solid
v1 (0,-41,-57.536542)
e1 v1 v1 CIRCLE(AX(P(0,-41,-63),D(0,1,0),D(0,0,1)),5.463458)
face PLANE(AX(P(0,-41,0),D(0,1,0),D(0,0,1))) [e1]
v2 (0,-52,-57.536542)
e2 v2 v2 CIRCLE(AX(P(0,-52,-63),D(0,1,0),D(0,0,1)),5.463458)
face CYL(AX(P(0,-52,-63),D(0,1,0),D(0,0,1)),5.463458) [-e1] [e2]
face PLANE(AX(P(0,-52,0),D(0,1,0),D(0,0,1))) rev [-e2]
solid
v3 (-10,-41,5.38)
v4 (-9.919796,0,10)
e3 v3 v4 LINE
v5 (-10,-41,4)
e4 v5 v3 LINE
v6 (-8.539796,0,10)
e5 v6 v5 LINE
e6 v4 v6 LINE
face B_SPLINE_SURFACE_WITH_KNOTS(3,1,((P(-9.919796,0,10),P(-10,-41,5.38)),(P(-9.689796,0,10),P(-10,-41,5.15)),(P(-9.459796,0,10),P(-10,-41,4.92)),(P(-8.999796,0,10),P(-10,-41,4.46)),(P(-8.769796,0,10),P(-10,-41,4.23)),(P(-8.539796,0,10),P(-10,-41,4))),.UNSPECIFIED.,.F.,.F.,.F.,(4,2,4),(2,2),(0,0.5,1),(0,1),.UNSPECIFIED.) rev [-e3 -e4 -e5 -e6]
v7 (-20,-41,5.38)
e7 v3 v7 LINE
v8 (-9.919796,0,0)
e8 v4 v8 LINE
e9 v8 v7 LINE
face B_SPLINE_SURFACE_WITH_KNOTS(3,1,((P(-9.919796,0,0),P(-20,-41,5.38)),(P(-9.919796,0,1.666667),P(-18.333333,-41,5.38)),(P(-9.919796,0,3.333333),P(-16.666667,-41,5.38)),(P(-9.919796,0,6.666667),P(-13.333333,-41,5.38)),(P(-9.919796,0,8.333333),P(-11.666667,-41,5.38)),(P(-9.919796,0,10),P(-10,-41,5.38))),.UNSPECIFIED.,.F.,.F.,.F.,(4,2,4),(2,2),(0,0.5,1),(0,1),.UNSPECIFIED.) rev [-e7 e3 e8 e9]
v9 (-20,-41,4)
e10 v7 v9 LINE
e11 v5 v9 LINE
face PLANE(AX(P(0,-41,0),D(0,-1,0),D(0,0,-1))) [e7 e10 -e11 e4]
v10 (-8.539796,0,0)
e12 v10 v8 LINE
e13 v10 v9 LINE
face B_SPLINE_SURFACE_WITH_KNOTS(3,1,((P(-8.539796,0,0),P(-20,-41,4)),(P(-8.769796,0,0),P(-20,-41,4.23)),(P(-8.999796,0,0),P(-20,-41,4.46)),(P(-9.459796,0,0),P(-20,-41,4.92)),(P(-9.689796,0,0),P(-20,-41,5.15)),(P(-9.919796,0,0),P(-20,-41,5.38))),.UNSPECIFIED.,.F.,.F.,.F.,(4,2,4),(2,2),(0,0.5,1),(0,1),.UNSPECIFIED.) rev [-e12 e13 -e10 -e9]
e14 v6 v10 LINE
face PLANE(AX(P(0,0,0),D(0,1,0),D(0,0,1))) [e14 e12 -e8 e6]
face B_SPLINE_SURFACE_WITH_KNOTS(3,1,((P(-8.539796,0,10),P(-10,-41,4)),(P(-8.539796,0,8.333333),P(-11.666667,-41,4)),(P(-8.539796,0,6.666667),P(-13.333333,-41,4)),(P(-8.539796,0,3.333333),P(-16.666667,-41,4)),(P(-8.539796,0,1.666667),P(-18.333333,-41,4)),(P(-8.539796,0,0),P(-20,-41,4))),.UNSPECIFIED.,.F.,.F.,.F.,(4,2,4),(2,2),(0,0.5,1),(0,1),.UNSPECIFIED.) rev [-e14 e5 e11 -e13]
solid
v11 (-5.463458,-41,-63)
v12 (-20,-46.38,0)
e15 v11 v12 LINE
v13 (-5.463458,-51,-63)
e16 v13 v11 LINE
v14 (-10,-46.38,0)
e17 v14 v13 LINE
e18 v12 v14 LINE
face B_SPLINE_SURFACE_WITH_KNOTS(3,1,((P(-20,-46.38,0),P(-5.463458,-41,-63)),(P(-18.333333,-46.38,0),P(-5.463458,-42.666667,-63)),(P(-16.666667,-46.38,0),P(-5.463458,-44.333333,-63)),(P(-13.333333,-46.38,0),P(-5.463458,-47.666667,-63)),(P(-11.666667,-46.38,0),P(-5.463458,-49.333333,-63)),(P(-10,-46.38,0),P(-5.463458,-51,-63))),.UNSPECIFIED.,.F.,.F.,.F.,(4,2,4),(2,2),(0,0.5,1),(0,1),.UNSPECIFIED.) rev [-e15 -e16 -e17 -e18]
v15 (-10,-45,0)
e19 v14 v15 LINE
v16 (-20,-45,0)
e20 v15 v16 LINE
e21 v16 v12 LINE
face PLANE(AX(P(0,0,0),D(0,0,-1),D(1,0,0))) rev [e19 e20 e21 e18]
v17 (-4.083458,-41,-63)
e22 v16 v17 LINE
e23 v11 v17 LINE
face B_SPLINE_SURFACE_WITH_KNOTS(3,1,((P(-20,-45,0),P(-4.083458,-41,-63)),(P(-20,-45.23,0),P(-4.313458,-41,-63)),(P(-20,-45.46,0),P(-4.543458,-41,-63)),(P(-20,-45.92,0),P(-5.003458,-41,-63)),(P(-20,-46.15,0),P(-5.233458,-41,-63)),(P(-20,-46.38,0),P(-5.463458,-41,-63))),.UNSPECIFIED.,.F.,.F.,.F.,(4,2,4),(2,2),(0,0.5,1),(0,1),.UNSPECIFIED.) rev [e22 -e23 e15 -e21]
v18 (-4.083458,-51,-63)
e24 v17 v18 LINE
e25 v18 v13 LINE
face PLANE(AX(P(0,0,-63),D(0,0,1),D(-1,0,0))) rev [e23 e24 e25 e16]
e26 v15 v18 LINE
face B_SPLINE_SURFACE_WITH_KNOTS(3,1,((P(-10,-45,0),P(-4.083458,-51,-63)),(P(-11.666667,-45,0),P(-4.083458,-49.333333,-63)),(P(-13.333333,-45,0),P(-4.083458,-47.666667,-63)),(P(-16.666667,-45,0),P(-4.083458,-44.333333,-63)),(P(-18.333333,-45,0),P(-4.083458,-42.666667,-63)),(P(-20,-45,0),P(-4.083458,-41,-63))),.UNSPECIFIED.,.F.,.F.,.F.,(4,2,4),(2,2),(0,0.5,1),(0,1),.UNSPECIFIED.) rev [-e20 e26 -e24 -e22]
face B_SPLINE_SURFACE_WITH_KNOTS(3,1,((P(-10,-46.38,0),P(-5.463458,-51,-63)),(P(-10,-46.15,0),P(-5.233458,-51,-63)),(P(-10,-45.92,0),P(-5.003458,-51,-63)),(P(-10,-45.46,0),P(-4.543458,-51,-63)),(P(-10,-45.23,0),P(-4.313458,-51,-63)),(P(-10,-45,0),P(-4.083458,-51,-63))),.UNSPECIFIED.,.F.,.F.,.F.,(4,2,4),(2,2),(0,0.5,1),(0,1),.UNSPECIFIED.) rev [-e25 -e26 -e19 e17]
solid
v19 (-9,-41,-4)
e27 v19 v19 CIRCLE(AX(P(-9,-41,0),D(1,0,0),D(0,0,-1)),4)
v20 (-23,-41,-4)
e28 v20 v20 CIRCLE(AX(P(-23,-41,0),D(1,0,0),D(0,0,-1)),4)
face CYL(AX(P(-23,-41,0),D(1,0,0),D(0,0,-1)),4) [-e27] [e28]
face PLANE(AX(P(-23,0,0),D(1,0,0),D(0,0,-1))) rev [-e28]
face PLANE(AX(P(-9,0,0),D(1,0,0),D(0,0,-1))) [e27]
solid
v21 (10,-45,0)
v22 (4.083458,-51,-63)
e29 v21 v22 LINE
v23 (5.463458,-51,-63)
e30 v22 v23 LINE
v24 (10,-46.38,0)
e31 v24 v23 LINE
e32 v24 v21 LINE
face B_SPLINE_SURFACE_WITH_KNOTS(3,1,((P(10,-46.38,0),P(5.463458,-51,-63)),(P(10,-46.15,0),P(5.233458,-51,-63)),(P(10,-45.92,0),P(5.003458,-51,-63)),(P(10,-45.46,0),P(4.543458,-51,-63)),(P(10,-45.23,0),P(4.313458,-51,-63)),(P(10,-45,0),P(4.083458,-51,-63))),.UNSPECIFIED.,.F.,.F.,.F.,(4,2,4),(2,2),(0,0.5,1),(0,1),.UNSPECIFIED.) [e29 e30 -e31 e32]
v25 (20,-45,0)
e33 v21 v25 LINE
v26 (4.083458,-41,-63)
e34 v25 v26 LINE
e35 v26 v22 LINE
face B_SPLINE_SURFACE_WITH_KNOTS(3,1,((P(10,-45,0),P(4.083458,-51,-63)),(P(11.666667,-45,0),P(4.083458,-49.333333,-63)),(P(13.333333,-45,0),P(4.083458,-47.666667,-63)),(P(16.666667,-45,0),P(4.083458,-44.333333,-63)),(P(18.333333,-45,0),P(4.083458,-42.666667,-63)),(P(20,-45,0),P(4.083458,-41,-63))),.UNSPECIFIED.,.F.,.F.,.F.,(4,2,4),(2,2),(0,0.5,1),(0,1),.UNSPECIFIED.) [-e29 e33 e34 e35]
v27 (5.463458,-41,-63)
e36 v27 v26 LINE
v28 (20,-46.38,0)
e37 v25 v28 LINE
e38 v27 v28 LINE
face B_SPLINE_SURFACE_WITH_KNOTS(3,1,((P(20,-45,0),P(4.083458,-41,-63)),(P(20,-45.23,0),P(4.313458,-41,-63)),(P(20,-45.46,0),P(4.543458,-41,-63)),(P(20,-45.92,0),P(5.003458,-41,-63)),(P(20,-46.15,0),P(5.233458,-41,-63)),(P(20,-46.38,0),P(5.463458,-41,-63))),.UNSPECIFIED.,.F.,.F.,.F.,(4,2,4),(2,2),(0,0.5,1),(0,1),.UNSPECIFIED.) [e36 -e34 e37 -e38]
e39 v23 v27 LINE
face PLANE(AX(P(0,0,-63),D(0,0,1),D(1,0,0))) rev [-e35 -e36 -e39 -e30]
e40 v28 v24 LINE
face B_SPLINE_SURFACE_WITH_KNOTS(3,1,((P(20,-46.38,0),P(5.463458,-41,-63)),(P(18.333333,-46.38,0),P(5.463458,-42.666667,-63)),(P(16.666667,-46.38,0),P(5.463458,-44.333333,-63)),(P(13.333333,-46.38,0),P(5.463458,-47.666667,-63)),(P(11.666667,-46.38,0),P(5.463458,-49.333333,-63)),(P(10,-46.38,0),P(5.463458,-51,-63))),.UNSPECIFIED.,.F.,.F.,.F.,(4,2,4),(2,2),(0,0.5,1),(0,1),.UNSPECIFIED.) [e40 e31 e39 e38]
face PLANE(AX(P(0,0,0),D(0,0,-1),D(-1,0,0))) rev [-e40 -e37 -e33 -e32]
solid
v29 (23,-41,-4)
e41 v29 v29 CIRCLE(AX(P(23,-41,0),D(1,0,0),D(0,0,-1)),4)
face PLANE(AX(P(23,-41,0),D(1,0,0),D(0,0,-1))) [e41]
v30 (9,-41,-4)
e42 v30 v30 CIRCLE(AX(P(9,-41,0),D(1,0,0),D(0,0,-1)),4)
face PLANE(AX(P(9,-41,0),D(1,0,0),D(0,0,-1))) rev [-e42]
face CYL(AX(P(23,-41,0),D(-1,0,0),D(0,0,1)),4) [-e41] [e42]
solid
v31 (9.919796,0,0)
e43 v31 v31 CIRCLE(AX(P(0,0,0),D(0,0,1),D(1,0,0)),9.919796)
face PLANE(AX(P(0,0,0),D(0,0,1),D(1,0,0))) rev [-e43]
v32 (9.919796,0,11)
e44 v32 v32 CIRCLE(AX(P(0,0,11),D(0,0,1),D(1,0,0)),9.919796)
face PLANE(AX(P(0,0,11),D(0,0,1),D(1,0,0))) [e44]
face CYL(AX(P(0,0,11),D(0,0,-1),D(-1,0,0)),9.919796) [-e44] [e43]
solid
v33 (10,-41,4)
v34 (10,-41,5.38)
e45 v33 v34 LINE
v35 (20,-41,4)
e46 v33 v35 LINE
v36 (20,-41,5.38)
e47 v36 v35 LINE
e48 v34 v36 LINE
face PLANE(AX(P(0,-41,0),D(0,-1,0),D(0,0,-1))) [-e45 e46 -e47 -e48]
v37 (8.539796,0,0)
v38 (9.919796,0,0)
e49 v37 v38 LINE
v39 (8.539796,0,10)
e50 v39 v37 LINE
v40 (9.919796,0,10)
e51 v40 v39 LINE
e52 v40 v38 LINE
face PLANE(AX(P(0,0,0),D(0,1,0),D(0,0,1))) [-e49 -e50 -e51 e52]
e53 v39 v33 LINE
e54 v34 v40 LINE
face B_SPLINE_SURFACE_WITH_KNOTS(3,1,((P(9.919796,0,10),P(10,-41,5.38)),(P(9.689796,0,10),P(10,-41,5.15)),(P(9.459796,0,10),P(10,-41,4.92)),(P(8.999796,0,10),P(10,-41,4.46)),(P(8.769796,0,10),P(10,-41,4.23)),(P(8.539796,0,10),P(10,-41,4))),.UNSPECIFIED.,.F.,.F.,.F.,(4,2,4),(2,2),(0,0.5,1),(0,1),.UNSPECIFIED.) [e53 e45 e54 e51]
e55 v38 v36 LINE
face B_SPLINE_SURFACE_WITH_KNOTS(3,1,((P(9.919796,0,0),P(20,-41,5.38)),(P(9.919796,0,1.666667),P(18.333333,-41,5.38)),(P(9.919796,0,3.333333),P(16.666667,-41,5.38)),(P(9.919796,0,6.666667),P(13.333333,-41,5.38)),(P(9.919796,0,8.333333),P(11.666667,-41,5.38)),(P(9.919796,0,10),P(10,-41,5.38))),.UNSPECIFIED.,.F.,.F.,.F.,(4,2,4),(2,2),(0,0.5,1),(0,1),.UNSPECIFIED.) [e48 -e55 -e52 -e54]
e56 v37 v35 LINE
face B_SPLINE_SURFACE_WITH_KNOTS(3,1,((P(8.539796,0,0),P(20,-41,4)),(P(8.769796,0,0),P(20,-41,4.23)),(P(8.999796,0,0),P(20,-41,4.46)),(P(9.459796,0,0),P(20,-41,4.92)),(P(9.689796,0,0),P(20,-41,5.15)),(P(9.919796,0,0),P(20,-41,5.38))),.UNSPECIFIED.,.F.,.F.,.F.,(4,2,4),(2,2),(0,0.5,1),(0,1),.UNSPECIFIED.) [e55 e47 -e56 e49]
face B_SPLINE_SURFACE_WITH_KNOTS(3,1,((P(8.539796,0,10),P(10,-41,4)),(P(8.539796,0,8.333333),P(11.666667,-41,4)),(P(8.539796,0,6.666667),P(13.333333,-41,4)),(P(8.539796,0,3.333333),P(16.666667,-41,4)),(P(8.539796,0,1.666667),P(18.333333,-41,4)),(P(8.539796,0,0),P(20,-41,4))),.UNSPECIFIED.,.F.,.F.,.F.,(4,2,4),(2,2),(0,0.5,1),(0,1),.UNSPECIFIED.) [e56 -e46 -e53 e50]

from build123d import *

# Parameters (mm, degrees)
SKETCH_1_R      = 9.919796
EXTRUDE_1_DEPTH = 11
SKETCH_3_R      = 5.463458
EXTRUDE_2_DEPTH = 11
EXTRUDE_START   = 9
SKETCH_4_R      = 4
EXTRUDE_3_DEPTH = 14
EXTRUDE_START_2 = -9
SKETCH_4_3_R    = 4
EXTRUDE_4_DEPTH = 14


with BuildPart() as part:
    # Эскиз1 → Бобышка-Вытянуть1 (new body)
    with BuildSketch(Plane.XY):
        Circle(SKETCH_1_R)
    extrude(amount=EXTRUDE_1_DEPTH)


with BuildPart() as body_2:
    # Эскиз3 → Бобышка-Вытянуть2 (new body)
    with BuildSketch(Plane(origin=(0, -41, 0), x_dir=(1, 0, 0), z_dir=(0, 1, 0))):
        with Locations(Location((0, 63, 0), (0, 0, 270))):
            Circle(SKETCH_3_R)
    extrude(amount=-EXTRUDE_2_DEPTH)


with BuildPart() as body_3:
    # Эскиз4 → Бобышка-Вытянуть3 (new body)
    with BuildSketch(Plane(origin=(0, 0, 0), x_dir=(0, 0, -1), z_dir=(1, 0, 0)).offset(EXTRUDE_START)):
        with Locations((0, -41)):
            Circle(SKETCH_4_R)
    extrude(amount=EXTRUDE_3_DEPTH)


with BuildPart() as body_4:
    # Эскиз4<3> → Бобышка-Вытянуть4 (new body)
    with BuildSketch(Plane(origin=(0, 0, 0), x_dir=(0, 0, -1), z_dir=(1, 0, 0)).offset(EXTRUDE_START_2)):
        with Locations((0, -41)):
            Circle(SKETCH_4_3_R)
    extrude(amount=-EXTRUDE_4_DEPTH)


with BuildPart() as body_5:
    # По сечениям1: read off the stored shape, not the designer's step
    # По сечениям1: loft between two sections, ruled curve by curve
    loft_1_from = [
        Edge.make_bspline([(9.919796, 0, 10), (9.689796, 0, 10), (9.459796, 0, 10), (8.999796, 0, 10), (8.769796, 0, 10), (8.539796, 0, 10)], [0, 0, 0, 0, 0.5, 0.5, 1, 1, 1, 1], 3),
        Edge.make_bspline([(8.539796, 0, 10), (8.539796, 0, 8.333333333), (8.539796, 0, 6.666666667), (8.539796, 0, 3.333333333), (8.539796, 0, 1.666666667), (8.539796, 0, 0)], [0, 0, 0, 0, 0.5, 0.5, 1, 1, 1, 1], 3),
        Edge.make_bspline([(9.919796, 0, 0), (9.919796, 0, 1.666666667), (9.919796, 0, 3.333333333), (9.919796, 0, 6.666666667), (9.919796, 0, 8.333333333), (9.919796, 0, 10)], [0, 0, 0, 0, 0.5, 0.5, 1, 1, 1, 1], 3),
        Edge.make_bspline([(8.539796, 0, 0), (8.769796, 0, 0), (8.999796, 0, 0), (9.459796, 0, 0), (9.689796, 0, 0), (9.919796, 0, 0)], [0, 0, 0, 0, 0.5, 0.5, 1, 1, 1, 1], 3),
    ]
    loft_1_to = [
        Edge.make_bspline([(10, -41, 5.38), (10, -41, 5.15), (10, -41, 4.92), (10, -41, 4.46), (10, -41, 4.23), (10, -41, 4)], [0, 0, 0, 0, 0.5, 0.5, 1, 1, 1, 1], 3),
        Edge.make_bspline([(10, -41, 4), (11.666666667, -41, 4), (13.333333333, -41, 4), (16.666666667, -41, 4), (18.333333333, -41, 4), (20, -41, 4)], [0, 0, 0, 0, 0.5, 0.5, 1, 1, 1, 1], 3),
        Edge.make_bspline([(20, -41, 5.38), (18.333333333, -41, 5.38), (16.666666667, -41, 5.38), (13.333333333, -41, 5.38), (11.666666667, -41, 5.38), (10, -41, 5.38)], [0, 0, 0, 0, 0.5, 0.5, 1, 1, 1, 1], 3),
        Edge.make_bspline([(20, -41, 4), (20, -41, 4.23), (20, -41, 4.46), (20, -41, 4.92), (20, -41, 5.15), (20, -41, 5.38)], [0, 0, 0, 0, 0.5, 0.5, 1, 1, 1, 1], 3),
    ]
    loft_1 = Solid(Shell([*[Face.make_surface_from_curves(loft_1_from[k], loft_1_to[k]) for k in range(4)], Face(Wire(loft_1_from)), Face(Wire(loft_1_to))]))
    add(loft_1)


with BuildPart() as body_6:
    # По сечениям3: read off the stored shape, not the designer's step
    # По сечениям3: loft between two sections, ruled curve by curve
    loft_3_from = [
        Edge.make_bspline([(20, -46.38, 0), (18.333333333, -46.38, 0), (16.666666667, -46.38, 0), (13.333333333, -46.38, 0), (11.666666667, -46.38, 0), (10, -46.38, 0)], [0, 0, 0, 0, 0.5, 0.5, 1, 1, 1, 1], 3),
        Edge.make_bspline([(10, -46.38, 0), (10, -46.15, 0), (10, -45.92, 0), (10, -45.46, 0), (10, -45.23, 0), (10, -45, 0)], [0, 0, 0, 0, 0.5, 0.5, 1, 1, 1, 1], 3),
        Edge.make_bspline([(20, -45, 0), (20, -45.23, 0), (20, -45.46, 0), (20, -45.92, 0), (20, -46.15, 0), (20, -46.38, 0)], [0, 0, 0, 0, 0.5, 0.5, 1, 1, 1, 1], 3),
        Edge.make_bspline([(10, -45, 0), (11.666666667, -45, 0), (13.333333333, -45, 0), (16.666666667, -45, 0), (18.333333333, -45, 0), (20, -45, 0)], [0, 0, 0, 0, 0.5, 0.5, 1, 1, 1, 1], 3),
    ]
    loft_3_to = [
        Edge.make_bspline([(5.463458, -41, -63), (5.463458, -42.666666667, -63), (5.463458, -44.333333333, -63), (5.463458, -47.666666667, -63), (5.463458, -49.333333333, -63), (5.463458, -51, -63)], [0, 0, 0, 0, 0.5, 0.5, 1, 1, 1, 1], 3),
        Edge.make_bspline([(5.463458, -51, -63), (5.233458, -51, -63), (5.003458, -51, -63), (4.543458, -51, -63), (4.313458, -51, -63), (4.083458, -51, -63)], [0, 0, 0, 0, 0.5, 0.5, 1, 1, 1, 1], 3),
        Edge.make_bspline([(4.083458, -41, -63), (4.313458, -41, -63), (4.543458, -41, -63), (5.003458, -41, -63), (5.233458, -41, -63), (5.463458, -41, -63)], [0, 0, 0, 0, 0.5, 0.5, 1, 1, 1, 1], 3),
        Edge.make_bspline([(4.083458, -51, -63), (4.083458, -49.333333333, -63), (4.083458, -47.666666667, -63), (4.083458, -44.333333333, -63), (4.083458, -42.666666667, -63), (4.083458, -41, -63)], [0, 0, 0, 0, 0.5, 0.5, 1, 1, 1, 1], 3),
    ]
    loft_3 = Solid(Shell([*[Face.make_surface_from_curves(loft_3_from[k], loft_3_to[k]) for k in range(4)], Face(Wire(loft_3_from)), Face(Wire(loft_3_to))]))
    add(loft_3)


with BuildPart() as body_7:
    # Зеркальное отражение7: mirrored copy
    add(body_6.part.mirror(Plane(origin=(0, 0, 0), x_dir=(0, 0, 1), z_dir=(1, 0, 0))))


with BuildPart() as body_8:
    # Mirror 7 2: mirrored copy
    add(body_5.part.mirror(Plane(origin=(0, 0, 0), x_dir=(0, 0, 1), z_dir=(1, 0, 0))))


solid = Compound([part.part, body_2.part, body_3.part, body_4.part, body_5.part, body_6.part, body_7.part, body_8.part])
